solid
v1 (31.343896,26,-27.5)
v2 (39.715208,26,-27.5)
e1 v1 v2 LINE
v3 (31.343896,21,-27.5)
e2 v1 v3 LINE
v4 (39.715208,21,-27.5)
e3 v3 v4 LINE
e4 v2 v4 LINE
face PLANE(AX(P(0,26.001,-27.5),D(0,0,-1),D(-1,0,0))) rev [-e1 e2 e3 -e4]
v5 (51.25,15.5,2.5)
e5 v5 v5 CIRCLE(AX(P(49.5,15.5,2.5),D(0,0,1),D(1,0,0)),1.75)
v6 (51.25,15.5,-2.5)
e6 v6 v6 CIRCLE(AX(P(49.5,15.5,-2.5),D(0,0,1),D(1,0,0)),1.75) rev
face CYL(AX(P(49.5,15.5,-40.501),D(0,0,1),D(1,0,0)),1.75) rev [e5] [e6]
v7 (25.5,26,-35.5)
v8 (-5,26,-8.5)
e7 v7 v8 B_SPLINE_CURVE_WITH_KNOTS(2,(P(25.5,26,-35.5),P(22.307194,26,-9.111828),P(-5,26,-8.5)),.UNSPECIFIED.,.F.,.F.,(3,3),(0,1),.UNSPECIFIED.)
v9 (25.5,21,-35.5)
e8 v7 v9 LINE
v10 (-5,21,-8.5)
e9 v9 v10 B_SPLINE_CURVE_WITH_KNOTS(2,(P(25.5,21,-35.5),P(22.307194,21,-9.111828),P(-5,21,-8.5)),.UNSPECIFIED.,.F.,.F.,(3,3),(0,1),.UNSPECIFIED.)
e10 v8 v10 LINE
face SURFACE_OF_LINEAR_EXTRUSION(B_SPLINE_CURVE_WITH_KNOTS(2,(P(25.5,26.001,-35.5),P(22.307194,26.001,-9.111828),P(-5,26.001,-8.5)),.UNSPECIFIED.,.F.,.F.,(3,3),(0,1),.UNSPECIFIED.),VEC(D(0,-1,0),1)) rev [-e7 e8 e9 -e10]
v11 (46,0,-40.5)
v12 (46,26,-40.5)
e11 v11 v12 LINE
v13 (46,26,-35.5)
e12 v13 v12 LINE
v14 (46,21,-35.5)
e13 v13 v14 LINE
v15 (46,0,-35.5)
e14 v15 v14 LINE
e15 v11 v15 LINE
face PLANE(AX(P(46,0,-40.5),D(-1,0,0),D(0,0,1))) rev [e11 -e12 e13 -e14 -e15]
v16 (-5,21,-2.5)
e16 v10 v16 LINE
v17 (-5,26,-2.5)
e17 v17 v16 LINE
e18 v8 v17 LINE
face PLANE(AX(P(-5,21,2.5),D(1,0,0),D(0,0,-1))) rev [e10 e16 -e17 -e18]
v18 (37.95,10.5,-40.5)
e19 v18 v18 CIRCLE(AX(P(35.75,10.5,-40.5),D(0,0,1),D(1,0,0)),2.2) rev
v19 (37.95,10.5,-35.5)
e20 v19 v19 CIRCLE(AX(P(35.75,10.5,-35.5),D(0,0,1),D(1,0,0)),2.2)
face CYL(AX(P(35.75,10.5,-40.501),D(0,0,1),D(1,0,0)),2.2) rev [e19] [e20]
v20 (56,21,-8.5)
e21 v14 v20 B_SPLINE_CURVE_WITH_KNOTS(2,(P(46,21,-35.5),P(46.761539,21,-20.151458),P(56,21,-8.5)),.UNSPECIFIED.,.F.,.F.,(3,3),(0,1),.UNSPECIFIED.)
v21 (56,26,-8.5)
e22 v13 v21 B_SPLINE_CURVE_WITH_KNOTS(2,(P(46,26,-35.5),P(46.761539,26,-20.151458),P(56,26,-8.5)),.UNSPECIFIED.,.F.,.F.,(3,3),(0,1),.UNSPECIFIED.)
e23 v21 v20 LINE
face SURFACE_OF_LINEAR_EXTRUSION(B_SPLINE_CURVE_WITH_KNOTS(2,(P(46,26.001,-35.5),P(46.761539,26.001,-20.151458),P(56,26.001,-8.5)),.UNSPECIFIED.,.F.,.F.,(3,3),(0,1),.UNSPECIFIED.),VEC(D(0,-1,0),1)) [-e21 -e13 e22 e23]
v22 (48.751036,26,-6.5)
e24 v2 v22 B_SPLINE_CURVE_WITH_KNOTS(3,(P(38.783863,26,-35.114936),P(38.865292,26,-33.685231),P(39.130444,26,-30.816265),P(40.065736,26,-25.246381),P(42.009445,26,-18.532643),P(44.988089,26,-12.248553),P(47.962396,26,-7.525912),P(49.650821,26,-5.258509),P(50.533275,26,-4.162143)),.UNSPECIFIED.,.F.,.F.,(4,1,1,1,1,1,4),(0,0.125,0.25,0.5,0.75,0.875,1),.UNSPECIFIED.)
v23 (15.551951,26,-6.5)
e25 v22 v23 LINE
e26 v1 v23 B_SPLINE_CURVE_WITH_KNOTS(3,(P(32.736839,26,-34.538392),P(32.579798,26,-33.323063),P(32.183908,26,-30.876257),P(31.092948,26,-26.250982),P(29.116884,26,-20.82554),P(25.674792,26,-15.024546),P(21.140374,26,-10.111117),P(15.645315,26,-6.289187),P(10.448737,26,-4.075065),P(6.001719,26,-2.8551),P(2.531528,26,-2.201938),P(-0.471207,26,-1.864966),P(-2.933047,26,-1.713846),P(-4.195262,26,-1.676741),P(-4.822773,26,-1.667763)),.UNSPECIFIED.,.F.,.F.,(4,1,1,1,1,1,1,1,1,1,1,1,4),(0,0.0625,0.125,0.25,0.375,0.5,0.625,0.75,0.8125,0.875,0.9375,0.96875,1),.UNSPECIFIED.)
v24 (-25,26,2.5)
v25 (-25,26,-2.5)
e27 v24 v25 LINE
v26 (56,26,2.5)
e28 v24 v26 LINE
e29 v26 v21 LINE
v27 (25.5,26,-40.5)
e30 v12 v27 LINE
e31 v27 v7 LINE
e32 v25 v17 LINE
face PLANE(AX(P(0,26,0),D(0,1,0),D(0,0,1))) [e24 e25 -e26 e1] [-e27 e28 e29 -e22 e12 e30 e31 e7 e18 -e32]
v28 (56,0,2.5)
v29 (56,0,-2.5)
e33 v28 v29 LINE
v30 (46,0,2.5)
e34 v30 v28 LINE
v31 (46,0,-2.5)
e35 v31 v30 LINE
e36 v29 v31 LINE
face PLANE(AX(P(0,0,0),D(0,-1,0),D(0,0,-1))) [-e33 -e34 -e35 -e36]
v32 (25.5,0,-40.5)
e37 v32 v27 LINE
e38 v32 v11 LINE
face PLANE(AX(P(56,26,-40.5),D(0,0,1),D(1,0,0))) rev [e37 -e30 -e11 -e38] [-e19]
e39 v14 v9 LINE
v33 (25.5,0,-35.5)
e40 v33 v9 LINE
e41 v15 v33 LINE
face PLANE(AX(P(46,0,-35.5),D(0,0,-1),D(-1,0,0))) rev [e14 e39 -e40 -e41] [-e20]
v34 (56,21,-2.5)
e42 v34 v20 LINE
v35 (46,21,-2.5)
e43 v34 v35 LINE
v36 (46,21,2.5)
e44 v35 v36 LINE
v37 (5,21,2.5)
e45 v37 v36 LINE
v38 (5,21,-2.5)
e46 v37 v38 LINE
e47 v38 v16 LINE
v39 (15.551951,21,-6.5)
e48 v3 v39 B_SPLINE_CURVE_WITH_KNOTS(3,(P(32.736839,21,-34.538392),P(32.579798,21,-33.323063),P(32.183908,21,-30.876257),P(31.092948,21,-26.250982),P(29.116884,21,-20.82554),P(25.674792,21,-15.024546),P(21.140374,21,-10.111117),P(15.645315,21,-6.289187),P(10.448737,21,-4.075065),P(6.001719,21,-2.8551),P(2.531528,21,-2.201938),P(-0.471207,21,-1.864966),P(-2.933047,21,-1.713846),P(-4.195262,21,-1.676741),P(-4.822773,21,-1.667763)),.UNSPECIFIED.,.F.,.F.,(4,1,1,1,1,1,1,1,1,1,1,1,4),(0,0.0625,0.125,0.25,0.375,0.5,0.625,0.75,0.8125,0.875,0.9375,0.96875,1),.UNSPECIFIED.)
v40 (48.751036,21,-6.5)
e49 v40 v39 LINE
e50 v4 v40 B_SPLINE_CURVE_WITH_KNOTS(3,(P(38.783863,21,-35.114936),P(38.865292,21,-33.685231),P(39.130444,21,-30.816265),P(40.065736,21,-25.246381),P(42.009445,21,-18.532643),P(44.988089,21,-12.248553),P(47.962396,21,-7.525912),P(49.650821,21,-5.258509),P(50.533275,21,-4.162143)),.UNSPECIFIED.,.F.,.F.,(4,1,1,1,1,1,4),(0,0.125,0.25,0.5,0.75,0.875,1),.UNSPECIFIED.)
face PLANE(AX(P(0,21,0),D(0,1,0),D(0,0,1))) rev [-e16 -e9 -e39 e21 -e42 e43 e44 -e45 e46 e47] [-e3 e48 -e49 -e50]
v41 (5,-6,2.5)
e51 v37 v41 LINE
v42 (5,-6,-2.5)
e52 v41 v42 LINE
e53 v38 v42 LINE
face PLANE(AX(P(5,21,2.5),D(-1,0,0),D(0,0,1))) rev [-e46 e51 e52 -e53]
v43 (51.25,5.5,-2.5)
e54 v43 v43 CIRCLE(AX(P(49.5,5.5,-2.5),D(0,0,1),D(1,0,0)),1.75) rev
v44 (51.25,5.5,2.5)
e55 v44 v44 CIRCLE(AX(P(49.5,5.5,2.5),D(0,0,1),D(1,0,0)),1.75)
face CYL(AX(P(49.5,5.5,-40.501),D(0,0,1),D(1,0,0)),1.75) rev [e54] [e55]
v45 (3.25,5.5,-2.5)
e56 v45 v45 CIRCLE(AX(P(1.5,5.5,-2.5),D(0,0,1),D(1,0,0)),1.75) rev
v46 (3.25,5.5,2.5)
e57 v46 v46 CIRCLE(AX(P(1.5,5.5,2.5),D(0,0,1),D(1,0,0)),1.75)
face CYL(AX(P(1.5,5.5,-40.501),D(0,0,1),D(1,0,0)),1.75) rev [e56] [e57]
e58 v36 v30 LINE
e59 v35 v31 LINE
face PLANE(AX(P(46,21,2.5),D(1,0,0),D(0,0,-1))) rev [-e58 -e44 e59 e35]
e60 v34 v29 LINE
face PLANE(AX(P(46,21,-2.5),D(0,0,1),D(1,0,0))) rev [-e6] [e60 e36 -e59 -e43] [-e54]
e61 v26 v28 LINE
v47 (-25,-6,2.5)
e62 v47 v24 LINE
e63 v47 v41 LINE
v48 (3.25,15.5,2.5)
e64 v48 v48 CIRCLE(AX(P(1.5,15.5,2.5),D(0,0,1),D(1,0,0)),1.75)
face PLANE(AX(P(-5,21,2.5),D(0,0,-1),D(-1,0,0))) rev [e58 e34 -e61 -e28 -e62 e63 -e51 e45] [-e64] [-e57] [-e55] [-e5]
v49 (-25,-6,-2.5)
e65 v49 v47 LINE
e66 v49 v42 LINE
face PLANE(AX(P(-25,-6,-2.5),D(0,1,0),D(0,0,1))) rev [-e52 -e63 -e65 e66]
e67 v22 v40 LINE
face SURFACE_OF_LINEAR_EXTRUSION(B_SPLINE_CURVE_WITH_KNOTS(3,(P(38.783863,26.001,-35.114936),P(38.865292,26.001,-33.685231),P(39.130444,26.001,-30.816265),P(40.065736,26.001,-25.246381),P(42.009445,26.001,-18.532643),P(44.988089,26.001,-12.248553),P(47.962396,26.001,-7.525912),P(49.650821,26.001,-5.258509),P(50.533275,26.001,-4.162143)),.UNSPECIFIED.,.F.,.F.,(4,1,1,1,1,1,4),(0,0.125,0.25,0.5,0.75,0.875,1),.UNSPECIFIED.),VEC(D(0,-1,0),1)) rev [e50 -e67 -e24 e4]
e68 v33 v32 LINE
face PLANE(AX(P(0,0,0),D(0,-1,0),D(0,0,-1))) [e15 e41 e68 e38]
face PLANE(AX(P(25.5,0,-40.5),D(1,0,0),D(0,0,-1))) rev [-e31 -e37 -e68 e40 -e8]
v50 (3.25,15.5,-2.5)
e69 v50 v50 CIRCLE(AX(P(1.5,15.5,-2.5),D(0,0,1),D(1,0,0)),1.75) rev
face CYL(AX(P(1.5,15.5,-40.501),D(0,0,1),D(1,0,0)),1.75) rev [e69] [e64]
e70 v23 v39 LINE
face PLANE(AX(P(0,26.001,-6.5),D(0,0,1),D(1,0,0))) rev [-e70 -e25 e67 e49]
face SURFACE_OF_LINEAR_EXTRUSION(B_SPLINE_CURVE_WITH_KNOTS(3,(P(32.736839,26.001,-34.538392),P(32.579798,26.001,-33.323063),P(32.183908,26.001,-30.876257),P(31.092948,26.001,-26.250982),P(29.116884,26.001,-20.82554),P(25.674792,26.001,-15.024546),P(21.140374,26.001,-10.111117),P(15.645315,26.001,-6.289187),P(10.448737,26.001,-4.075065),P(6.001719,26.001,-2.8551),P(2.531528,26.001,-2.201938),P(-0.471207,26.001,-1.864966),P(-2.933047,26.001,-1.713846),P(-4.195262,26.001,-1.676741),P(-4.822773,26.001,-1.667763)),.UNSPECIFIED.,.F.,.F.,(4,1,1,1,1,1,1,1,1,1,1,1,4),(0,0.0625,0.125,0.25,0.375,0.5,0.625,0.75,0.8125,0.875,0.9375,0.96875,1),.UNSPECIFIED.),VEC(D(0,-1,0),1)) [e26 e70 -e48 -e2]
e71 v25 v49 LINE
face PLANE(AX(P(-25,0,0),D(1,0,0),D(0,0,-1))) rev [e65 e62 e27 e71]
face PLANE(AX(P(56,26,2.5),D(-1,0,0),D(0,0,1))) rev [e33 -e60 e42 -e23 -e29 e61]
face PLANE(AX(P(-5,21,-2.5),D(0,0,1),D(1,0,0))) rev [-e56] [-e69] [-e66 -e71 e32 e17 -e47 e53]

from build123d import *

# Parameters (mm, degrees)
SKETCH1_W             = 10
SKETCH1_H             = 5
BOSS_EXTRUDE1_DEPTH   = 21
BOSS_EXTRUDE1_2_DEPTH = 21
SKETCH2_W             = 61
SKETCH2_H             = 43
BOSS_EXTRUDE2_DEPTH   = 5
SKETCH3_W             = 20.5
SKETCH3_H             = 5
BOSS_EXTRUDE3_DEPTH   = 21
CUT_EXTRUDE1_REACH    = 74.498
SKETCH4_R             = 2.2
CUT_EXTRUDE2_REACH    = 77.24
SKETCH5_R             = 1.75
CUT_EXTRUDE4_START    = -5
CUT_EXTRUDE4_DEPTH    = 5
SKETCH11_W            = 5
SKETCH11_H            = 32
BOSS_EXTRUDE5_DEPTH   = 20
SKETCH14_W            = 10
SKETCH14_H            = 5
BOSS_EXTRUDE6_DEPTH   = 6


# Read off the part's stored shape, not the designer's step: Cut-Extrude4
with BuildPart() as part:
    # Sketch1 → Boss-Extrude1 (new body)
    with BuildSketch(Plane(origin=(0, 0, 0), x_dir=(1, 0, 0), z_dir=(0, 1, 0))):
        Rectangle(SKETCH1_W, SKETCH1_H)
    extrude(amount=BOSS_EXTRUDE1_DEPTH)



with BuildPart() as body_2:
    # Sketch1 → Boss-Extrude1 2 (new body)
    with BuildSketch(Plane(origin=(0, 0, 0), x_dir=(1, 0, 0), z_dir=(0, 1, 0))):
        with Locations((51, 0)):
            Rectangle(SKETCH1_W, SKETCH1_H)
    extrude(amount=BOSS_EXTRUDE1_2_DEPTH)


with BuildPart() as part_1:
    add(part.part)

    add(body_2.part)  # Boss-Extrude2 merges body 2
    # Sketch2 → Boss-Extrude2 (add)
    with BuildSketch(Plane(origin=(0, 21, 0), x_dir=(1, 0, 0), z_dir=(0, 1, 0))):
        with Locations((25.5, 19)):
            Rectangle(SKETCH2_W, SKETCH2_H)
    extrude(amount=BOSS_EXTRUDE2_DEPTH)

    # Sketch3 → Boss-Extrude3 (add)
    with BuildSketch(Plane.XZ.offset(-21)):
        with Locations((35.75, -38)):
            Rectangle(SKETCH3_W, SKETCH3_H)
    extrude(amount=BOSS_EXTRUDE3_DEPTH)

    # Sketch4 → Cut-Extrude1 (cut, up to next)
    with BuildSketch(Plane.XY.offset(-35.5), mode=Mode.PRIVATE) as cut_extrude1_sk1:
        with Locations((35.75, 10.5)):
            Circle(SKETCH4_R)
    cut_extrude1_tool1 = extrude(cut_extrude1_sk1.sketch, amount=-CUT_EXTRUDE1_REACH, mode=Mode.PRIVATE) & part_1.part
    add(cut_extrude1_tool1.solids().sort_by_distance((35.75, 10.5, -35.5))[0], mode=Mode.SUBTRACT)

    # Sketch5 → Cut-Extrude2 (cut, up to next)
    with BuildSketch(Plane.XY.offset(2.5), mode=Mode.PRIVATE) as cut_extrude2_sk1:
        with Locations((1.5, 15.5)):
            Circle(SKETCH5_R)
    cut_extrude2_tool1 = extrude(cut_extrude2_sk1.sketch, amount=-CUT_EXTRUDE2_REACH, mode=Mode.PRIVATE) & part_1.part
    # Sketch5 → Cut-Extrude2 (cut, up to next)
    with BuildSketch(Plane.XY.offset(2.5), mode=Mode.PRIVATE) as cut_extrude2_sk2:
        with Locations((49.5, 15.5)):
            Circle(SKETCH5_R)
    cut_extrude2_tool2 = extrude(cut_extrude2_sk2.sketch, amount=-CUT_EXTRUDE2_REACH, mode=Mode.PRIVATE) & part_1.part
    # Sketch5 → Cut-Extrude2 (cut, up to next)
    with BuildSketch(Plane.XY.offset(2.5), mode=Mode.PRIVATE) as cut_extrude2_sk3:
        with Locations((49.5, 5.5)):
            Circle(SKETCH5_R)
    cut_extrude2_tool3 = extrude(cut_extrude2_sk3.sketch, amount=-CUT_EXTRUDE2_REACH, mode=Mode.PRIVATE) & part_1.part
    # Sketch5 → Cut-Extrude2 (cut, up to next)
    with BuildSketch(Plane.XY.offset(2.5), mode=Mode.PRIVATE) as cut_extrude2_sk4:
        with Locations((1.5, 5.5)):
            Circle(SKETCH5_R)
    cut_extrude2_tool4 = extrude(cut_extrude2_sk4.sketch, amount=-CUT_EXTRUDE2_REACH, mode=Mode.PRIVATE) & part_1.part
    add(cut_extrude2_tool1.solids().sort_by_distance((1.5, 15.5, 2.5))[0], mode=Mode.SUBTRACT)
    add(cut_extrude2_tool2.solids().sort_by_distance((49.5, 15.5, 2.5))[0], mode=Mode.SUBTRACT)
    add(cut_extrude2_tool3.solids().sort_by_distance((49.5, 5.5, 2.5))[0], mode=Mode.SUBTRACT)
    add(cut_extrude2_tool4.solids().sort_by_distance((1.5, 5.5, 2.5))[0], mode=Mode.SUBTRACT)

    # Cut-Extrude4 outline → Cut-Extrude4 (cut)
    with BuildSketch(Plane.XZ.offset(-21).offset(CUT_EXTRUDE4_START)):
        with BuildLine():
            Line((25.5, -40.5), (25.5, -35.5))
            add(Edge.make_bspline(
                [(25.5, -35.5), (22.307194013, -9.111827573), (-5, -8.5)],
                knots=[0, 0, 0, 1, 1, 1], degree=2))
            Line((-5, -8.5), (-5, -40.5))
            Line((-5, -40.5), (25.5, -40.5))
        make_face()
        with BuildLine():
            Line((46, -35.5), (46, -40.5))
            Line((46, -40.5), (56, -40.5))
            Line((56, -40.5), (56, -8.5))
            add(Edge.make_bspline(
                [(46, -35.5), (46.761539252, -20.151458346), (56, -8.5)],
                knots=[0, 0, 0, 1, 1, 1], degree=2))
        make_face()
        with BuildLine():
            add(Edge.make_bspline(
                [(31.343896349, -27.5), (31.33756892, -27.477004827), (30.705752309, -25.187905516), (29.116883998, -20.825539694), (25.674792213, -15.02454609), (21.148134772, -10.119526716), (17.495807629, -7.576251466), (15.551950813, -6.5)],
                knots=[0.123732118, 0.123732118, 0.123732118, 0.123732118, 0.125, 0.25, 0.375, 0.5, 0.624358146, 0.624358146, 0.624358146, 0.624358146], degree=3))
            Line((31.343896349, -27.5), (39.715207905, -27.5))
            add(Edge.make_bspline(
                [(39.715207905, -27.5), (39.769177374, -27.217759906), (40.375135311, -24.177689148), (42.00944543, -18.53264277), (44.988088874, -12.248553286), (47.445071003, -8.34732733), (48.500497039, -6.84736316), (48.751036225, -6.5)],
                knots=[0.224487405, 0.224487405, 0.224487405, 0.224487405, 0.25, 0.5, 0.75, 0.875, 0.913034357, 0.913034357, 0.913034357, 0.913034357], degree=3))
            Line((48.751036225, -6.5), (15.551950813, -6.5))
        make_face()
    extrude(amount=CUT_EXTRUDE4_DEPTH, mode=Mode.SUBTRACT)

    # Sketch11 → Boss-Extrude5 (add)
    with BuildSketch(Plane.ZY.offset(5)):
        with Locations((0, 10)):
            Rectangle(SKETCH11_W, SKETCH11_H)
    extrude(amount=BOSS_EXTRUDE5_DEPTH)

    # Sketch14 → Boss-Extrude6 (add)
    with BuildSketch(Plane.XZ):
        Rectangle(SKETCH14_W, SKETCH14_H)
    extrude(amount=BOSS_EXTRUDE6_DEPTH)


solid = part_1.part
